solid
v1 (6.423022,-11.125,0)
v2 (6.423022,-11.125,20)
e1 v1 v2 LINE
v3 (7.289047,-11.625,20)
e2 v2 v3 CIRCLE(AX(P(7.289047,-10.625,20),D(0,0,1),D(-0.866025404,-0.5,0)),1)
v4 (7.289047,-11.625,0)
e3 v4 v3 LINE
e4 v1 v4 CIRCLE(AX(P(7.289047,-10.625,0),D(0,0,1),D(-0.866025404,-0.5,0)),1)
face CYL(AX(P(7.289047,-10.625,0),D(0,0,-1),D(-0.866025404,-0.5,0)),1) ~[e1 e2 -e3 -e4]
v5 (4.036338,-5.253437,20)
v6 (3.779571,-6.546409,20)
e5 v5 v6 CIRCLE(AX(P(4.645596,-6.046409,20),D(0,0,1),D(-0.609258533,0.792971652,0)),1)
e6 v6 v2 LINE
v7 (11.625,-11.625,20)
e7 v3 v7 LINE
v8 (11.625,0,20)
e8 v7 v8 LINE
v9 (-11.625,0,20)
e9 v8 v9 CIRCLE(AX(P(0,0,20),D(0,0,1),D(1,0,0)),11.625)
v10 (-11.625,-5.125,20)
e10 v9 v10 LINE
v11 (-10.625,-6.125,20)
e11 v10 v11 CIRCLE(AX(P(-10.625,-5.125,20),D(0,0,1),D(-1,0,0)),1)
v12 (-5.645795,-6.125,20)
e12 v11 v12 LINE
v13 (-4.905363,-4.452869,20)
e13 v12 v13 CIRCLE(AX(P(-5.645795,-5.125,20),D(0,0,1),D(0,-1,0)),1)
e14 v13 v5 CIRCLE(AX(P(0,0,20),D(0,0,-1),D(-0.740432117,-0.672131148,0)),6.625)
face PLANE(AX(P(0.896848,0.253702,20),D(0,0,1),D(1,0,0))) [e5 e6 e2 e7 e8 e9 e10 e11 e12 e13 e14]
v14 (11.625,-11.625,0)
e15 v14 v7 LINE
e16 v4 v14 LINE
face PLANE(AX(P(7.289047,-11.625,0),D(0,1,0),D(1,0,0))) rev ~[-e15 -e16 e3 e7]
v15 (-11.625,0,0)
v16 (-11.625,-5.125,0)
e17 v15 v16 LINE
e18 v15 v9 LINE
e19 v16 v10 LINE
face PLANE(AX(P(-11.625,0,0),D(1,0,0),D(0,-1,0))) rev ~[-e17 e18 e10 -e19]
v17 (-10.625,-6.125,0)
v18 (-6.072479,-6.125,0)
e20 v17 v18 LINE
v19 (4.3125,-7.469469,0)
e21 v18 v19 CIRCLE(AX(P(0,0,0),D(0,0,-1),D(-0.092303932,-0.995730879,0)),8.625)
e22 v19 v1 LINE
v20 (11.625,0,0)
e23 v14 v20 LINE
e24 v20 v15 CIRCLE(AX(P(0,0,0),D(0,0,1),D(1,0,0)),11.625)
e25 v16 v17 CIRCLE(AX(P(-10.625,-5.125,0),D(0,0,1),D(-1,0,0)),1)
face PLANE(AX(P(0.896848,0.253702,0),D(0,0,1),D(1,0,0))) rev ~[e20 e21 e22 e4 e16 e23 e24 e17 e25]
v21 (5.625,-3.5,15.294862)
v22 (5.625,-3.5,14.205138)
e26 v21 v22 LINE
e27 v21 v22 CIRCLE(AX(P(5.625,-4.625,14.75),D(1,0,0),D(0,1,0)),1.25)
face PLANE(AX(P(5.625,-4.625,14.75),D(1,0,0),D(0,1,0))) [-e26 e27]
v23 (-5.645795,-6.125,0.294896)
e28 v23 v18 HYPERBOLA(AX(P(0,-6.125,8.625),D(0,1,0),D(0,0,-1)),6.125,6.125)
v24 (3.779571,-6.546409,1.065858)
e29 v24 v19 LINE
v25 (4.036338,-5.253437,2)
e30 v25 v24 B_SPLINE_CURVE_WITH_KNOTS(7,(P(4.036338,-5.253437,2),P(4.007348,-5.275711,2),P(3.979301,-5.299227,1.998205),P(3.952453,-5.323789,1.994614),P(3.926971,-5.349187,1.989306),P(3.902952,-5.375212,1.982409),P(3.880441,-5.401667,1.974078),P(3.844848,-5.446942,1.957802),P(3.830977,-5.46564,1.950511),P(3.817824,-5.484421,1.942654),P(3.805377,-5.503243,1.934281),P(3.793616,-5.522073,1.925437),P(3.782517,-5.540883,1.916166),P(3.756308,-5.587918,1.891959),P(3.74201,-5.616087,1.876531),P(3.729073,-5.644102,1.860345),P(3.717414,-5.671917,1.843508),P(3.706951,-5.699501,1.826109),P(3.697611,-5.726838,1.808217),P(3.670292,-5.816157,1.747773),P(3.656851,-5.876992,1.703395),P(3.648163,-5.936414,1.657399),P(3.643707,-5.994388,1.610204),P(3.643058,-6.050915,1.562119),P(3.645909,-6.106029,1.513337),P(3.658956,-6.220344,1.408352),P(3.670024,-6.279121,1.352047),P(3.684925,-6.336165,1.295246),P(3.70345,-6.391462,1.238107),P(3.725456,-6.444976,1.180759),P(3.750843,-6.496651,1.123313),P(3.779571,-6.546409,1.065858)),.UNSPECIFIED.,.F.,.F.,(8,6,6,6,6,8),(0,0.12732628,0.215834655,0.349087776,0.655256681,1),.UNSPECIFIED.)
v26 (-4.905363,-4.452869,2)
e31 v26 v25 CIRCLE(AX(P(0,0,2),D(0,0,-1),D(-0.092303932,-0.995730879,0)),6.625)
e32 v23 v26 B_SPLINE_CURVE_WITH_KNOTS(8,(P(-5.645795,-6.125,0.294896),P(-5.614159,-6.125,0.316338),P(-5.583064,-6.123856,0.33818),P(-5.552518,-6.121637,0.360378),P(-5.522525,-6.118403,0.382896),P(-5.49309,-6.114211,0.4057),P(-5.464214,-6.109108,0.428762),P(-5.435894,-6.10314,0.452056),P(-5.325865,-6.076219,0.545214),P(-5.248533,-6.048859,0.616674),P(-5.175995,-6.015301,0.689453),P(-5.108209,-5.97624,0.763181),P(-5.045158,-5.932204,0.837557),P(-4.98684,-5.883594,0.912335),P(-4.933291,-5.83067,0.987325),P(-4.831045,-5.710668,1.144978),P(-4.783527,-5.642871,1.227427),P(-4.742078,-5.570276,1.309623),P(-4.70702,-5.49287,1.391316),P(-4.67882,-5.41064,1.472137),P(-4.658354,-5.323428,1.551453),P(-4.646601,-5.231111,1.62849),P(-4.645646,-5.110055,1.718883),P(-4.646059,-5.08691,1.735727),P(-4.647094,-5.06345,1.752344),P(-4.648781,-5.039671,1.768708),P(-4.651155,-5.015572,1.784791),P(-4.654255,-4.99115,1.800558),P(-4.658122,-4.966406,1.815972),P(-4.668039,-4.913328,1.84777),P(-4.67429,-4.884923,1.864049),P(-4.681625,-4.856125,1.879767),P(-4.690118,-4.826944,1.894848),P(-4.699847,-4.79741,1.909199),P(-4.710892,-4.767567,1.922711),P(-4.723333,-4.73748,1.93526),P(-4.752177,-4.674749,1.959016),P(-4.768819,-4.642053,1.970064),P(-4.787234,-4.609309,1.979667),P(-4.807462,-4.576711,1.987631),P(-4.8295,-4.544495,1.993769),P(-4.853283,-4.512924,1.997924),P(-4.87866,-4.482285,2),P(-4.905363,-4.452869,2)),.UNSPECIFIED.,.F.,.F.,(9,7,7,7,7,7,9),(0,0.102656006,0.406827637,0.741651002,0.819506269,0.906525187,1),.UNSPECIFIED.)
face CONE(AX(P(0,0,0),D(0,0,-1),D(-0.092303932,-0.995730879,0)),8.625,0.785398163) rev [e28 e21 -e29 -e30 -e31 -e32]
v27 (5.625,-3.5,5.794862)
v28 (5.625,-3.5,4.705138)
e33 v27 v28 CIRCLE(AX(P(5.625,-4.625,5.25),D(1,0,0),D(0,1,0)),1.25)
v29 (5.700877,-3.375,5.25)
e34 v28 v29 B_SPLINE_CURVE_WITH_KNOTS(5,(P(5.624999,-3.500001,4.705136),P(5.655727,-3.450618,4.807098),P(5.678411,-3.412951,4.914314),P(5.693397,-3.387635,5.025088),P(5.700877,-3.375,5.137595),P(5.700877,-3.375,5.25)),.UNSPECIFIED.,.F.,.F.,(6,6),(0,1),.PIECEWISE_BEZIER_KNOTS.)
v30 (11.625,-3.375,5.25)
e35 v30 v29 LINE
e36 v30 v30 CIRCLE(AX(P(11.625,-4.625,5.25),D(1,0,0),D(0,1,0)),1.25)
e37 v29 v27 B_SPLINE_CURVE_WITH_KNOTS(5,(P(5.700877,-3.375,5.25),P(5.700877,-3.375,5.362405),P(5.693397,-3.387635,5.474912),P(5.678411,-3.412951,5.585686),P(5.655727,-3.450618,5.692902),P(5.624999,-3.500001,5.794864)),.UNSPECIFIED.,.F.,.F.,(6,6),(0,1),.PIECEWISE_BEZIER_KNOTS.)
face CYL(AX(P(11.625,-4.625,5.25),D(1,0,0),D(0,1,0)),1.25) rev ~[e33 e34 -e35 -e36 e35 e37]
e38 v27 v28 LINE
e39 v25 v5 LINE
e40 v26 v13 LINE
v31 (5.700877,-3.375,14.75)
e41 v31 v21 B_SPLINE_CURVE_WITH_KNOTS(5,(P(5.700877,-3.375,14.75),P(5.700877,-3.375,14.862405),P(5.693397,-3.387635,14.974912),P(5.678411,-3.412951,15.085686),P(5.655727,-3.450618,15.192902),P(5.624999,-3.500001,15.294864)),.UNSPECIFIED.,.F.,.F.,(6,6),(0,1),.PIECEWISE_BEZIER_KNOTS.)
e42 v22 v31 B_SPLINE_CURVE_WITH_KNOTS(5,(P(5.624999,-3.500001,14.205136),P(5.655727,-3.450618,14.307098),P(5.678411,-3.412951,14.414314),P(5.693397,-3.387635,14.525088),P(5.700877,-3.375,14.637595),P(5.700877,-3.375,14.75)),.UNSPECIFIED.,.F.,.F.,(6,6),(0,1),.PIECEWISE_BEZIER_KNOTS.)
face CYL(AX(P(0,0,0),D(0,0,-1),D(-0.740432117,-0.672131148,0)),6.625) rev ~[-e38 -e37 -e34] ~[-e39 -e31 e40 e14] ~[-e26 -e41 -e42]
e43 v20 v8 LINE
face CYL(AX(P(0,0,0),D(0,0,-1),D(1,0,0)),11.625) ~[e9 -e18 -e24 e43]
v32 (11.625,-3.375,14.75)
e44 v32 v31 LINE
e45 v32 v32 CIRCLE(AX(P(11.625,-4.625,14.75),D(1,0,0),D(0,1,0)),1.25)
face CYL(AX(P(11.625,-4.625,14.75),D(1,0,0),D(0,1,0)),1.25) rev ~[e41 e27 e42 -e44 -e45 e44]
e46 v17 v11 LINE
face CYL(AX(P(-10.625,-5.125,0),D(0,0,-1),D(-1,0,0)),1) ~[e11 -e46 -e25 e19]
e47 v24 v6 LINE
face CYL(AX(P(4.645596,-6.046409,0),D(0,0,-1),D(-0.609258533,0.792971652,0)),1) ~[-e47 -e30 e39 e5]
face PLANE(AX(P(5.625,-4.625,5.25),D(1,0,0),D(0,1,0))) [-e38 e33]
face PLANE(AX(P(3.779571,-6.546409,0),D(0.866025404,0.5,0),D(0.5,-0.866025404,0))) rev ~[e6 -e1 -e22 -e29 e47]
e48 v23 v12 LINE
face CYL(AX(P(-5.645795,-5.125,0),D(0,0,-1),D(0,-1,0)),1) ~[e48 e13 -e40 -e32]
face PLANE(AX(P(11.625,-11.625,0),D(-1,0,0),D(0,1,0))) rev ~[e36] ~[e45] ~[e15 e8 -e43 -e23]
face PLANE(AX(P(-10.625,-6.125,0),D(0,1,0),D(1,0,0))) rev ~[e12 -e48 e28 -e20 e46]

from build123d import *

# Parameters (mm, degrees)
F1_DEPTH    = 20
F2_R        = 1.25
F3_DEPTH    = 6
F4_T2_ANGLE = 359.64


# Not quite as in the source:
# - a fillet or chamfer that OpenCascade refuses, or shapes differently, is made with other operations: its cross-section is extruded or revolved along the edge and cut away or added
# - a feature names something its author has since deleted; it is built from what else it names


with BuildPart() as f1:
    # F0 (on Top) → F1 (new body)
    with BuildSketch(Plane.XY):
        with BuildLine():
            Line((11.625, -11.625), (11.625, 0))
            ThreePointArc((11.625, 0), (0, 11.625), (-11.625, 0))
            Line((-11.625, 0), (-11.625, -5.125))
            ThreePointArc((-11.625, -5.125), (-11.3321067812, -5.8321067812), (-10.625, -6.125))
            Line((-10.625, -6.125), (-5.6457948953, -6.125))
            ThreePointArc((-5.6457948953, -6.125), (-4.7314286811, -5.5298881651), (-4.9053627779, -4.4528688525))
            ThreePointArc((-4.9053627779, -4.4528688525), (0.5907863647, 6.598605646), (4.0363377793, -5.2534371921))
            ThreePointArc((4.0363377793, -5.2534371921), (3.6647499446, -5.8516258782), (3.7795709082, -6.5464088438))
            Line((3.7795709082, -6.5464088438), (6.4230217447, -11.125))
            ThreePointArc((6.4230217447, -11.125), (6.7890471485, -11.4910254038), (7.2890471485, -11.625))
            Line((7.2890471485, -11.625), (11.625, -11.625))
        make_face()
    extrude(amount=F1_DEPTH)

    # F2 (on face) → F3 (cut)
    with BuildSketch(Plane.YZ.offset(11.625)):
        with Locations((-4.625, 14.75)):
            Circle(F2_R)
        with Locations((-4.625, 5.25)):
            Circle(F2_R)
    extrude(amount=-F3_DEPTH, mode=Mode.SUBTRACT)

    # F4: chamfer of 2 on 1 edges, made by hand

    # F4_s1 → F4_t2 (revolve, cut)
    with BuildSketch(Plane(origin=(0, 0, 0), x_dir=(0, 0, 1), z_dir=(0.9957308794, -0.0923039315, 0))):
        Polygon((0, 8.625), (2, 6.625), (0, 6.625), align=None)
    revolve(axis=Axis((0, 0, 0), (0, 0, -1)), revolution_arc=F4_T2_ANGLE, mode=Mode.SUBTRACT)


solid = f1.part
